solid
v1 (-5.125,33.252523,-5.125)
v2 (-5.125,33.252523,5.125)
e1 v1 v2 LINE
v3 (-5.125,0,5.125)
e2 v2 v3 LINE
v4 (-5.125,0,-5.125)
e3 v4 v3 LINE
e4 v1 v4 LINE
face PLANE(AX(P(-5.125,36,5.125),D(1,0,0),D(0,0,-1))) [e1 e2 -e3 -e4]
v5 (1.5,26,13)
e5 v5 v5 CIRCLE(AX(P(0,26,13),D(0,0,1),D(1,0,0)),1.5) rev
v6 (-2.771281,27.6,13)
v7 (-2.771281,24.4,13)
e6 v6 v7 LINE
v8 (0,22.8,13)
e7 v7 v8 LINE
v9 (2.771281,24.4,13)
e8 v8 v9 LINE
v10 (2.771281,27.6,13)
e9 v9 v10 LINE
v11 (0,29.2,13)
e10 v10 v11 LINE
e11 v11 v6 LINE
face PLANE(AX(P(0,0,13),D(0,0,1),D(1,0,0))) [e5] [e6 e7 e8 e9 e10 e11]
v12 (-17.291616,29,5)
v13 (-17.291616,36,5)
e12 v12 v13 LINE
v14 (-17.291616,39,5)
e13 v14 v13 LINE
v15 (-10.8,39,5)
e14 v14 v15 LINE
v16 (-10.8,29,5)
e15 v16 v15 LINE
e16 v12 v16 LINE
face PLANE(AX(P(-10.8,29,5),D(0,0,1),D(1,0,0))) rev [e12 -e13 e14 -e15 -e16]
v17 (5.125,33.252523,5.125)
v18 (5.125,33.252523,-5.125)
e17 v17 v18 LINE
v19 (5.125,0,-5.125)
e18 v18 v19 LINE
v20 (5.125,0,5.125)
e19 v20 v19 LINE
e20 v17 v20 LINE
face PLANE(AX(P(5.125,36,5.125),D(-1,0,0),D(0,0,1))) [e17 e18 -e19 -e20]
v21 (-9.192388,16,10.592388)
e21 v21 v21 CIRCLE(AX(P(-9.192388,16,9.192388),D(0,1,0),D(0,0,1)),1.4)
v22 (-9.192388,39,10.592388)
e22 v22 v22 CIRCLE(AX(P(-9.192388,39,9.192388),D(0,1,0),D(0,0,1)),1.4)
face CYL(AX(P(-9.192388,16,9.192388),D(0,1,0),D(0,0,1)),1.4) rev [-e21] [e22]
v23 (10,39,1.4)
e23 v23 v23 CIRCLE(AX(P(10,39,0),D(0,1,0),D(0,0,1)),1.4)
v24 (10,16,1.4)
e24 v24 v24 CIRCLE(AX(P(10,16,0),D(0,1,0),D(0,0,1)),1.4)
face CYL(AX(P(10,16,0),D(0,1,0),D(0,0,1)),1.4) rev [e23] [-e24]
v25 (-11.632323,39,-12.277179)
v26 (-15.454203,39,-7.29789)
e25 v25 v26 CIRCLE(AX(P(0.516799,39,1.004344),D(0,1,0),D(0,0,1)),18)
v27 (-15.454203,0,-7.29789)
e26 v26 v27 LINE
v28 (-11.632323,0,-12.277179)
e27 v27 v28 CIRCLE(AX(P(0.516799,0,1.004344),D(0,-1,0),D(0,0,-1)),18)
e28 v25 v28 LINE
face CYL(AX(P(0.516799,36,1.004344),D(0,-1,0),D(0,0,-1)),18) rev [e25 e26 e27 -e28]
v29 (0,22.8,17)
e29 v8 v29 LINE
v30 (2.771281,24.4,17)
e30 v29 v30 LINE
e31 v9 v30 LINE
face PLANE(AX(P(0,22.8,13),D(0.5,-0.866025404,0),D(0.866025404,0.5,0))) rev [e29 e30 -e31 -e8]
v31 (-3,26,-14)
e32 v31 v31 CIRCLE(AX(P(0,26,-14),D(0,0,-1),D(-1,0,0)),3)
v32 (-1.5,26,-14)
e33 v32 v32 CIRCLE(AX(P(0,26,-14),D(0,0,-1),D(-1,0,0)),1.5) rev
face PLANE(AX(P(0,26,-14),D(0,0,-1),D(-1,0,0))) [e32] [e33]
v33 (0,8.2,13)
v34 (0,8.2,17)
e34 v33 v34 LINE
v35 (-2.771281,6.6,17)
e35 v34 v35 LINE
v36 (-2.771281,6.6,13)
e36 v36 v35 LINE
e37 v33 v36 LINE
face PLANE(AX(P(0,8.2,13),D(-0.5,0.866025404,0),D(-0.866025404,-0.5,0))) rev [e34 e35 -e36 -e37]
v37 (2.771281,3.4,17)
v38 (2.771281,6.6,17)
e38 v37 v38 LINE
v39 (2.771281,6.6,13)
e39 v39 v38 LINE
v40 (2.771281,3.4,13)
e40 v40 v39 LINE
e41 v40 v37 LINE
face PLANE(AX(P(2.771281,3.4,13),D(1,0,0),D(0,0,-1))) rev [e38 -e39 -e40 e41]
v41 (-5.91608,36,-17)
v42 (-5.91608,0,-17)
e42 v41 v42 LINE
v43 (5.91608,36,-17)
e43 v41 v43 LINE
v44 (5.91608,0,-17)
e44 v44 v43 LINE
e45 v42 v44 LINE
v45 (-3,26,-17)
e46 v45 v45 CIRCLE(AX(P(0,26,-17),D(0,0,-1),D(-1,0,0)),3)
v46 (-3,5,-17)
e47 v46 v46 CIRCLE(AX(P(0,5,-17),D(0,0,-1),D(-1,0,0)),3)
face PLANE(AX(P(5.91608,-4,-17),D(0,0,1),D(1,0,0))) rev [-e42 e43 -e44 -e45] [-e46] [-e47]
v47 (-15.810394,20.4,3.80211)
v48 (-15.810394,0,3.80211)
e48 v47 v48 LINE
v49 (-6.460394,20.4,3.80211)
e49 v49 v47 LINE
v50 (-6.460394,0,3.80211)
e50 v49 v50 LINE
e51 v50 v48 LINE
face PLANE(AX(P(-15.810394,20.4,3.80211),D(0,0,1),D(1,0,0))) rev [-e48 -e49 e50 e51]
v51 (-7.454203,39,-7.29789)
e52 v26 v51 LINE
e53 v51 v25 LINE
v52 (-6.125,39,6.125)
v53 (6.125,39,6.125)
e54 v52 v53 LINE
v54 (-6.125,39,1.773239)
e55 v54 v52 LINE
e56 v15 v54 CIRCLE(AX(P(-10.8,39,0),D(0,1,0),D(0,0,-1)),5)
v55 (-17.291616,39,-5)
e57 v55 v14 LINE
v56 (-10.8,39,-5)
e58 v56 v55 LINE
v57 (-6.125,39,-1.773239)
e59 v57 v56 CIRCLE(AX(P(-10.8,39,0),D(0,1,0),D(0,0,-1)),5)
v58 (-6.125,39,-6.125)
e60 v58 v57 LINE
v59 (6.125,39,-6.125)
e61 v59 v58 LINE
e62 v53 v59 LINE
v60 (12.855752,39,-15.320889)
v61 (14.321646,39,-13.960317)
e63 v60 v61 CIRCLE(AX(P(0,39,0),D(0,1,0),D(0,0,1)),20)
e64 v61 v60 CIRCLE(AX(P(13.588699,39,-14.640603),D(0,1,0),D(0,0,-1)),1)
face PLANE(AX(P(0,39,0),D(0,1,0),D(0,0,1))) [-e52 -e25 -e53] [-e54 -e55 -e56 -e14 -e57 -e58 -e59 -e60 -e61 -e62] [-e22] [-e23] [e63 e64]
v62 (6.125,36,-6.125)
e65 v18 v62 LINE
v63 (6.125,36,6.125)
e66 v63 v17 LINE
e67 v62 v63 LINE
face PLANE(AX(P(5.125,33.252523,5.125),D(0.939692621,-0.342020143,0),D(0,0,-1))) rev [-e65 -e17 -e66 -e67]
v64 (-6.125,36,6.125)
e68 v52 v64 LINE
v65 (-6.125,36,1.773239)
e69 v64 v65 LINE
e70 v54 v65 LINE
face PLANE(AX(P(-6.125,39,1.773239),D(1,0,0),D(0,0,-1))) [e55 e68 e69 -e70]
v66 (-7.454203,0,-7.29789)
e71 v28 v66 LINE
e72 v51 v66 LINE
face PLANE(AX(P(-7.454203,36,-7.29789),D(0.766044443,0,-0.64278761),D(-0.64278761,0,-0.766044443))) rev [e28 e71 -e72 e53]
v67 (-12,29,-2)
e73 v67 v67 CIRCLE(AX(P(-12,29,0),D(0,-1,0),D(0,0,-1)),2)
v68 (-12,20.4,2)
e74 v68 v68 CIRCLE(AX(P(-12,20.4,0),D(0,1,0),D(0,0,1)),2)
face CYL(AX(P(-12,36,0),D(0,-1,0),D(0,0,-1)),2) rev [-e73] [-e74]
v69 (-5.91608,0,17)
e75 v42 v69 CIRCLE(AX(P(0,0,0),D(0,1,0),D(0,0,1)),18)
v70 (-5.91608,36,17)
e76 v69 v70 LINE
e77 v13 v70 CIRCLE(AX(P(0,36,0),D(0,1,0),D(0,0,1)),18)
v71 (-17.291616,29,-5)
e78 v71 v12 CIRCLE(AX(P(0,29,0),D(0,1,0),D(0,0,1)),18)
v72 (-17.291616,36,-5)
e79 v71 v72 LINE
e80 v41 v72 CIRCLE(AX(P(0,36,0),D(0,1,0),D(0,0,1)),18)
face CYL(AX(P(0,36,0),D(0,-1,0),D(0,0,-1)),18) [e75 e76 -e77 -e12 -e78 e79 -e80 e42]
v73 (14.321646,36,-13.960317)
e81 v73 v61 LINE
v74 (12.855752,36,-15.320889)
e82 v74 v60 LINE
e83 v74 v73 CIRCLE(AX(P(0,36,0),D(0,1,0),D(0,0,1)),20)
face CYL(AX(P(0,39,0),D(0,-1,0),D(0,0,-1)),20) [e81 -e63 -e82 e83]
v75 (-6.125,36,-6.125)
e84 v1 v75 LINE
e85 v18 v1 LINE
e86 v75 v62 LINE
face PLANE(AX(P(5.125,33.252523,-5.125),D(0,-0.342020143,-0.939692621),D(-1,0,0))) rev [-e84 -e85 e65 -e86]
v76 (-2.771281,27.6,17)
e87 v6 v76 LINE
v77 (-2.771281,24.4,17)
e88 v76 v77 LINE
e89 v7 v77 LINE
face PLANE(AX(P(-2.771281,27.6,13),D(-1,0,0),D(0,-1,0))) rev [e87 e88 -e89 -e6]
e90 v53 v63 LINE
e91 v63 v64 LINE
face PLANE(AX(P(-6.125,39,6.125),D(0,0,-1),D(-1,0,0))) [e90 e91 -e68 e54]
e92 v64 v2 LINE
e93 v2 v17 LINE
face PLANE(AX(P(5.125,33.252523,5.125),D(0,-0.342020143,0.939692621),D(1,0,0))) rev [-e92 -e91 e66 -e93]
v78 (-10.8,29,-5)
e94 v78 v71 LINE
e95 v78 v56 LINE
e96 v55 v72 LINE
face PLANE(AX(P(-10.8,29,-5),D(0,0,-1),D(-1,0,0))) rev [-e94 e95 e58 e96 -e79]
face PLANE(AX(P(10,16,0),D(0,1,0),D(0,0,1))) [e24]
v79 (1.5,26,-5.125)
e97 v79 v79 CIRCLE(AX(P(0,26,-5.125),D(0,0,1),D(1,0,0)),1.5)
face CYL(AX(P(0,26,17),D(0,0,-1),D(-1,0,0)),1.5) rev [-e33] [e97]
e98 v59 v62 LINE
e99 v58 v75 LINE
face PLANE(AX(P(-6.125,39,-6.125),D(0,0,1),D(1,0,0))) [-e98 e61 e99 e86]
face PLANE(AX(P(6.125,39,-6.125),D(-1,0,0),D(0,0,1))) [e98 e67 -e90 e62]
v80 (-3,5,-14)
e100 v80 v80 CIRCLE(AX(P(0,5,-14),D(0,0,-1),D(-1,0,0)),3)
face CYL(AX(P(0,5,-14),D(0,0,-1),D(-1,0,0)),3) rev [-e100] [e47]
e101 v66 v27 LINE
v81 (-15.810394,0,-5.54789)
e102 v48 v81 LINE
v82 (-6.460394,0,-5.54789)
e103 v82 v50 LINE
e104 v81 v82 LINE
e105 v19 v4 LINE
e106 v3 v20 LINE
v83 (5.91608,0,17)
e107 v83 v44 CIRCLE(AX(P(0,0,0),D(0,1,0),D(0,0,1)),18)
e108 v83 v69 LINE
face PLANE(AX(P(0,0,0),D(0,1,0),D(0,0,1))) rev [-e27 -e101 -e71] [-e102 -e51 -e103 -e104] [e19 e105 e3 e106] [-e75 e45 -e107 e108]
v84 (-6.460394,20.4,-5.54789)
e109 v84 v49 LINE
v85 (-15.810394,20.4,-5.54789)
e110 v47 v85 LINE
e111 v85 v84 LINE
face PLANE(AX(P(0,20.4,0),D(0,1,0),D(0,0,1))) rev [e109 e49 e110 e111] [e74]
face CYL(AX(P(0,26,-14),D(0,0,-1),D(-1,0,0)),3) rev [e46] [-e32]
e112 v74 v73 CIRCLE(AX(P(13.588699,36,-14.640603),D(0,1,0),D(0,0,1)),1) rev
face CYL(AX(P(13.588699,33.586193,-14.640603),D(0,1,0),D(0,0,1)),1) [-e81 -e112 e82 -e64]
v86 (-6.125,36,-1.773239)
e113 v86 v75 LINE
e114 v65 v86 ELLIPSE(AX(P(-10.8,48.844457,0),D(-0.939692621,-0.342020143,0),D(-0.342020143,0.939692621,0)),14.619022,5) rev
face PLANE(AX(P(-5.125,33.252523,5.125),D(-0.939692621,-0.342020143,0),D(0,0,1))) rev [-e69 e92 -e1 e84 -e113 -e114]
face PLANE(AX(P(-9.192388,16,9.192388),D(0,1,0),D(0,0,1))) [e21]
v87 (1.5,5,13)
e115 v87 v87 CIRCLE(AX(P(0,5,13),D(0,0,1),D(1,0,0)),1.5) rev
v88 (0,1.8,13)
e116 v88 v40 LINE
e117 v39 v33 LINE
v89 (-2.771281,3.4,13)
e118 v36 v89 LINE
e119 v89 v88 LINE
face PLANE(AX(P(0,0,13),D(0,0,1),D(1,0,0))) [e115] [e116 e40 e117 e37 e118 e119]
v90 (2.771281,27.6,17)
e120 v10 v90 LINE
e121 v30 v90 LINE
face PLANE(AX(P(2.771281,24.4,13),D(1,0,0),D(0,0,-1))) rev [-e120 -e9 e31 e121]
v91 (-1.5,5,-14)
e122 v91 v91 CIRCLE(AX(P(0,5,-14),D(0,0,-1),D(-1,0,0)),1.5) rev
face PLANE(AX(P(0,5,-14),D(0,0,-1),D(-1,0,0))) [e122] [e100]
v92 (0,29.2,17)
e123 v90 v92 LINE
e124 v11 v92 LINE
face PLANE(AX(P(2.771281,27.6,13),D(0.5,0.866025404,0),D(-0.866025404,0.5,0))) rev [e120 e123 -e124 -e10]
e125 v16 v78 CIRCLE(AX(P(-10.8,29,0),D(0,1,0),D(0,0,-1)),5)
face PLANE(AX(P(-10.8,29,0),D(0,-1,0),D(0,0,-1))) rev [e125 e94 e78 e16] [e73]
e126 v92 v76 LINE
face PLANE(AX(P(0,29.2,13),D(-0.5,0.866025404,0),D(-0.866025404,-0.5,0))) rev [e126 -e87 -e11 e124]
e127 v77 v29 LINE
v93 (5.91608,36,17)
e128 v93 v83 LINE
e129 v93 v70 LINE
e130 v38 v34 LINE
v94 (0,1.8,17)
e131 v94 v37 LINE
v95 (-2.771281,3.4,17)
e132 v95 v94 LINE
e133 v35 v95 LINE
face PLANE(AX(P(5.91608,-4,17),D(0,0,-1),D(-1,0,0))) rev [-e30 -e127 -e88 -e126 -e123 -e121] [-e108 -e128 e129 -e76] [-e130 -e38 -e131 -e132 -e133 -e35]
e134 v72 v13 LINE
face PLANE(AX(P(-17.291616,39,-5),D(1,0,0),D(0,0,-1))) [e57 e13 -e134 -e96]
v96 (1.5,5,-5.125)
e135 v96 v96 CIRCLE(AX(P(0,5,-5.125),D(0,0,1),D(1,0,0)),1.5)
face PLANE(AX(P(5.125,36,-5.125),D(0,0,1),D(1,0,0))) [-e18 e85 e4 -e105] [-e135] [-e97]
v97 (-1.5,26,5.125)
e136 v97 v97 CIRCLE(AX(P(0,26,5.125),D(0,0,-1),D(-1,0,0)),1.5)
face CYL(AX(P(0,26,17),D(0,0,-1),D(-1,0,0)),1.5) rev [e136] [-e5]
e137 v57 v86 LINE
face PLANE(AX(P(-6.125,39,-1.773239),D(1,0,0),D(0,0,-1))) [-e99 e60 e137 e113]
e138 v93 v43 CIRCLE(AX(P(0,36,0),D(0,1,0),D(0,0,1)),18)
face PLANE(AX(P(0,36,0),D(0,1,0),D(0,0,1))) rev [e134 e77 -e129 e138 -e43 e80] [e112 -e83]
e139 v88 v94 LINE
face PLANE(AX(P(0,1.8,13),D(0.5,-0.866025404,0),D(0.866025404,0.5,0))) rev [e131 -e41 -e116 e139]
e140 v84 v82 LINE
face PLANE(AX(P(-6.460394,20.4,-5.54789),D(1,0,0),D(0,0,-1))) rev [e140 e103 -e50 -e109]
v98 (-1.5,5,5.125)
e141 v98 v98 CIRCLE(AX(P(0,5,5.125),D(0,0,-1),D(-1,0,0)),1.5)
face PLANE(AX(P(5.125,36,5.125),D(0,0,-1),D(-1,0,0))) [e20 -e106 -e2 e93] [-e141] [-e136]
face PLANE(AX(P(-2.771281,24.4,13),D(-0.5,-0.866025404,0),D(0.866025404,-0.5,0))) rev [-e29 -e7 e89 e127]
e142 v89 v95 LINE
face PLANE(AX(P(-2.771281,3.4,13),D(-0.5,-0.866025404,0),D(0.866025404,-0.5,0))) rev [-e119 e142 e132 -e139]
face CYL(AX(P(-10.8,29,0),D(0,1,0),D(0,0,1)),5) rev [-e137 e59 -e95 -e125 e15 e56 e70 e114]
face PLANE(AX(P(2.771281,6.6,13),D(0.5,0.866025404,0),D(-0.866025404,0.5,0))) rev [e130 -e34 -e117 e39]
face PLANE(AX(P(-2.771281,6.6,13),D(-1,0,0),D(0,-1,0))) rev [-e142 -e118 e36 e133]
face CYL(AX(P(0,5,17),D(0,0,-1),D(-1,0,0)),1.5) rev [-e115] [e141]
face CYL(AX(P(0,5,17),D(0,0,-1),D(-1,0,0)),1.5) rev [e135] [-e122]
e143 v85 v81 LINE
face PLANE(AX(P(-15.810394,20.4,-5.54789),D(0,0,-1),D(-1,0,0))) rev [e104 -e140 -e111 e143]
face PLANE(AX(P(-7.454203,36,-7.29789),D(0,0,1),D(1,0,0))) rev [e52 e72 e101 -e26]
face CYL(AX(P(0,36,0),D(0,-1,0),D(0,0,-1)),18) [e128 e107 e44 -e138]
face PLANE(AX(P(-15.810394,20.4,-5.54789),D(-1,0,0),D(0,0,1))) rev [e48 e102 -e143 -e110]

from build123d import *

# Parameters (mm, degrees)
SKETCH1_R           = 18
SKETCH1_R_2         = 2
SKETCH1_W           = 10.25
SKETCH1_H           = 10.25
BOSS_EXTRUDE1_DEPTH = 36
CUT_EXTRUDE1_START  = -7
CUT_EXTRUDE1_DEPTH  = 7
SKETCH4_W           = 9.35
SKETCH4_H           = 9.35
CUT_EXTRUDE3_DEPTH  = 20.4
CUT_EXTRUDE4_START  = -40
CUT_EXTRUDE4_DEPTH  = 40
SKETCH6_R           = 1.5
CUT_EXTRUDE5_DEPTH  = 53.687759489
SKETCH7_R           = 3
CUT_EXTRUDE6_DEPTH  = 3
CUT_EXTRUDE7_DEPTH  = 4
CHAMFER1_SIZE       = 1
CHAMFER1_SIZE_2     = 2.747477419
CUT_EXTRUDE8_DEPTH  = 44.69210455
SKETCH12_R          = 1.4
CUT_EXTRUDE10_DEPTH = 20
SKETCH13_R          = 20
SKETCH13_R_2        = 1.4
BOSS_EXTRUDE2_DEPTH = 3
BOSS_EXTRUDE3_DEPTH = 3


with BuildPart() as part:
    # Sketch1 → Boss-Extrude1 (new body)
    with BuildSketch(Plane(origin=(0, 0, 0), x_dir=(1, 0, 0), z_dir=(0, 1, 0))):
        with Locations(Location((0, 0, 0), (0, 0, 270))):
            Circle(SKETCH1_R)
        with Locations(Location((-12, 0, 0), (0, 0, 270))):
            Circle(SKETCH1_R_2, mode=Mode.SUBTRACT)
        Rectangle(SKETCH1_W, SKETCH1_H, mode=Mode.SUBTRACT)
    extrude(amount=BOSS_EXTRUDE1_DEPTH)

    # Sketch2 → Cut-Extrude1 (cut)
    with BuildSketch(Plane(origin=(0, 36, 0), x_dir=(1, 0, 0), z_dir=(0, 1, 0)).offset(CUT_EXTRUDE1_START)):
        with BuildLine():
            Line((-10.8, 5), (-17.291616466, 5))
            ThreePointArc((-17.291616466, 5), (-18, 0), (-17.291616466, -5))
            Line((-17.291616466, -5), (-10.8, -5))
            ThreePointArc((-10.8, -5), (-5.8, 0), (-10.8, 5))
        make_face()
    extrude(amount=CUT_EXTRUDE1_DEPTH, mode=Mode.SUBTRACT)

    # Sketch4 → Cut-Extrude3 (cut)
    with BuildSketch(Plane(origin=(0, 0, 0), x_dir=(-1, 0, 0), z_dir=(0, -1, 0))):
        with Locations((11.135393506, 0.872889968)):
            Rectangle(SKETCH4_W, SKETCH4_H)
    extrude(amount=-CUT_EXTRUDE3_DEPTH, mode=Mode.SUBTRACT)

    # Sketch5 → Cut-Extrude4 (cut)
    with BuildSketch(Plane(origin=(0, 36, 0), x_dir=(1, 0, 0), z_dir=(0, 1, 0)).offset(CUT_EXTRUDE4_START)):
        with BuildLine():
            Line((5.916079783, 17), (-5.916079783, 17))
            ThreePointArc((-5.916079783, 17), (0, 18), (5.916079783, 17))
        make_face()
        with BuildLine():
            Line((5.916079783, -17), (-5.916079783, -17))
            ThreePointArc((-5.916079783, -17), (0, -18), (5.916079783, -17))
        make_face()
    extrude(amount=CUT_EXTRUDE4_DEPTH, mode=Mode.SUBTRACT)

    # Sketch6 → Cut-Extrude5 (cut, through all)
    with BuildSketch(Plane(origin=(0, 0, -17), x_dir=(-1, 0, 0), z_dir=(0, 0, -1))):
        with Locations((0, 26)):
            Circle(SKETCH6_R)
        with Locations((0, 5)):
            Circle(SKETCH6_R)
    extrude(amount=-CUT_EXTRUDE5_DEPTH, mode=Mode.SUBTRACT)

    # Sketch7 → Cut-Extrude6 (cut)
    with BuildSketch(Plane(origin=(0, 0, -17), x_dir=(-1, 0, 0), z_dir=(0, 0, -1))):
        with Locations((0, 26)):
            Circle(SKETCH7_R)
        with Locations((0, 5)):
            Circle(SKETCH7_R)
    extrude(amount=-CUT_EXTRUDE6_DEPTH, mode=Mode.SUBTRACT)

    # Sketch8 → Cut-Extrude7 (cut)
    with BuildSketch(Plane.XY.offset(17)):
        Polygon((0, 22.8), (2.771281292, 24.4), (2.771281292, 27.6), (0, 29.2), (-2.771281292, 27.6), (-2.771281292, 24.4), align=None)
        Polygon((0, 1.8), (2.771281292, 3.4), (2.771281292, 6.6), (0, 8.2), (-2.771281292, 6.6), (-2.771281292, 3.4), align=None)
    extrude(amount=-CUT_EXTRUDE7_DEPTH, mode=Mode.SUBTRACT)

    # Chamfer1
    # the kernel refuses this chamfer: 2.747477419, 1 mm, written as the material it takes off along each edge
    with BuildSketch(Plane(origin=(-5.125, 36, -5.125), x_dir=(0, 0.09904090225204956, -0.9950833631817488), z_dir=(1, 0, 0)), Plane(origin=(-5.125, 36, 5.125), x_dir=(-0.9950833631817488, 0.09904090225204956, 0), z_dir=(0, 0, -1)), Plane(origin=(5.125, 36, 5.125), x_dir=(0, 0.09904090225204956, 0.9950833631817488), z_dir=(-1, 0, 0)), Plane(origin=(5.125, 36, -5.125), x_dir=(0.9950833631817488, 0.09904090225204956, 0), z_dir=(0, 0, 1))) as chamfer1_piece_1:
        Polygon((CHAMFER1_SIZE * 0.995083363182, -CHAMFER1_SIZE * 0.099040902252), (-CHAMFER1_SIZE_2 * 0.0990409022684, -CHAMFER1_SIZE_2 * 0.995083363346), (0, 0), align=None)
    extrude(amount=10.25, mode=Mode.SUBTRACT)
    with BuildSketch(Plane(origin=(-5.125, 36, 5.125), x_dir=(-0.9950833631817488, 0.09904090225204956, 0), z_dir=(0, 0, -1))) as chamfer1_piece_2a_section:
        Polygon((CHAMFER1_SIZE * 0.995083363182, -CHAMFER1_SIZE * 0.099040902252), (-CHAMFER1_SIZE_2 * 0.0990409022684, -CHAMFER1_SIZE_2 * 0.995083363346), (0, 0), align=None)
    chamfer1_piece_2a = extrude(amount=17.377491449, mode=Mode.PRIVATE)
    chamfer1_piece_2a = split(chamfer1_piece_2a, bisect_by=Plane(origin=(-5.432505006, 35.059901151, -5.125), z_dir=(0, 0, -1)), keep=Keep.TOP, mode=Mode.PRIVATE)
    with BuildSketch(Plane(origin=(-12.252491449, 36, -5.125), x_dir=(0, 0.09904090225204956, -0.9950833631817488), z_dir=(1, 0, 0))) as chamfer1_piece_2b_section:
        Polygon((CHAMFER1_SIZE * 0.995083363182, -CHAMFER1_SIZE * 0.099040902252), (-CHAMFER1_SIZE_2 * 0.0990409022684, -CHAMFER1_SIZE_2 * 0.995083363346), (0, 0), align=None)
    chamfer1_piece_2b = extrude(amount=17.377491449, mode=Mode.PRIVATE)
    chamfer1_piece_2b = split(chamfer1_piece_2b, bisect_by=Plane(origin=(-5.125, 35.059901151, -5.432505006), z_dir=(-1, 0, 0)), keep=Keep.TOP, mode=Mode.PRIVATE)
    chamfer1_piece_2 = chamfer1_piece_2a & chamfer1_piece_2b
    add(chamfer1_piece_2, mode=Mode.SUBTRACT)
    with BuildSketch(Plane(origin=(5.125, 36, -12.252491449), x_dir=(0.9950833631817488, 0.09904090225204956, 0), z_dir=(0, 0, 1))) as chamfer1_piece_3a_section:
        Polygon((CHAMFER1_SIZE * 0.995083363182, -CHAMFER1_SIZE * 0.099040902252), (-CHAMFER1_SIZE_2 * 0.0990409022684, -CHAMFER1_SIZE_2 * 0.995083363346), (0, 0), align=None)
    chamfer1_piece_3a = extrude(amount=17.377491449, mode=Mode.PRIVATE)
    chamfer1_piece_3a = split(chamfer1_piece_3a, bisect_by=Plane(origin=(5.432505006, 35.059901151, -5.125), z_dir=(0, 0, -1)), keep=Keep.TOP, mode=Mode.PRIVATE)
    with BuildSketch(Plane(origin=(-5.125, 36, -5.125), x_dir=(0, 0.09904090225204956, -0.9950833631817488), z_dir=(1, 0, 0))) as chamfer1_piece_3b_section:
        Polygon((CHAMFER1_SIZE * 0.995083363182, -CHAMFER1_SIZE * 0.099040902252), (-CHAMFER1_SIZE_2 * 0.0990409022684, -CHAMFER1_SIZE_2 * 0.995083363346), (0, 0), align=None)
    chamfer1_piece_3b = extrude(amount=17.377491449, mode=Mode.PRIVATE)
    chamfer1_piece_3b = split(chamfer1_piece_3b, bisect_by=Plane(origin=(5.125, 35.059901151, -5.432505006), z_dir=(1, 0, 0)), keep=Keep.TOP, mode=Mode.PRIVATE)
    chamfer1_piece_3 = chamfer1_piece_3a & chamfer1_piece_3b
    add(chamfer1_piece_3, mode=Mode.SUBTRACT)
    with BuildSketch(Plane(origin=(5.125, 36, 5.125), x_dir=(0, 0.09904090225204956, 0.9950833631817488), z_dir=(-1, 0, 0))) as chamfer1_piece_4a_section:
        Polygon((CHAMFER1_SIZE * 0.995083363182, -CHAMFER1_SIZE * 0.099040902252), (-CHAMFER1_SIZE_2 * 0.0990409022684, -CHAMFER1_SIZE_2 * 0.995083363346), (0, 0), align=None)
    chamfer1_piece_4a = extrude(amount=17.377491449, mode=Mode.PRIVATE)
    chamfer1_piece_4a = split(chamfer1_piece_4a, bisect_by=Plane(origin=(-5.125, 35.059901151, 5.432505006), z_dir=(-1, 0, 0)), keep=Keep.TOP, mode=Mode.PRIVATE)
    with BuildSketch(Plane(origin=(-5.125, 36, 12.252491449), x_dir=(-0.9950833631817488, 0.09904090225204956, 0), z_dir=(0, 0, -1))) as chamfer1_piece_4b_section:
        Polygon((CHAMFER1_SIZE * 0.995083363182, -CHAMFER1_SIZE * 0.099040902252), (-CHAMFER1_SIZE_2 * 0.0990409022684, -CHAMFER1_SIZE_2 * 0.995083363346), (0, 0), align=None)
    chamfer1_piece_4b = extrude(amount=17.377491449, mode=Mode.PRIVATE)
    chamfer1_piece_4b = split(chamfer1_piece_4b, bisect_by=Plane(origin=(-5.432505006, 35.059901151, 5.125), z_dir=(0, 0, 1)), keep=Keep.TOP, mode=Mode.PRIVATE)
    chamfer1_piece_4 = chamfer1_piece_4a & chamfer1_piece_4b
    add(chamfer1_piece_4, mode=Mode.SUBTRACT)
    with BuildSketch(Plane(origin=(12.252491449, 36, 5.125), x_dir=(0, 0.09904090225204956, 0.9950833631817488), z_dir=(-1, 0, 0))) as chamfer1_piece_5a_section:
        Polygon((CHAMFER1_SIZE * 0.995083363182, -CHAMFER1_SIZE * 0.099040902252), (-CHAMFER1_SIZE_2 * 0.0990409022684, -CHAMFER1_SIZE_2 * 0.995083363346), (0, 0), align=None)
    chamfer1_piece_5a = extrude(amount=17.377491449, mode=Mode.PRIVATE)
    chamfer1_piece_5a = split(chamfer1_piece_5a, bisect_by=Plane(origin=(5.125, 35.059901151, 5.432505006), z_dir=(1, 0, 0)), keep=Keep.TOP, mode=Mode.PRIVATE)
    with BuildSketch(Plane(origin=(5.125, 36, -5.125), x_dir=(0.9950833631817488, 0.09904090225204956, 0), z_dir=(0, 0, 1))) as chamfer1_piece_5b_section:
        Polygon((CHAMFER1_SIZE * 0.995083363182, -CHAMFER1_SIZE * 0.099040902252), (-CHAMFER1_SIZE_2 * 0.0990409022684, -CHAMFER1_SIZE_2 * 0.995083363346), (0, 0), align=None)
    chamfer1_piece_5b = extrude(amount=17.377491449, mode=Mode.PRIVATE)
    chamfer1_piece_5b = split(chamfer1_piece_5b, bisect_by=Plane(origin=(5.432505006, 35.059901151, 5.125), z_dir=(0, 0, 1)), keep=Keep.TOP, mode=Mode.PRIVATE)
    chamfer1_piece_5 = chamfer1_piece_5a & chamfer1_piece_5b
    add(chamfer1_piece_5, mode=Mode.SUBTRACT)

    # Sketch9 → Cut-Extrude8 (cut, through all)
    with BuildSketch(Plane.XZ):
        with BuildLine():
            Line((-7.454203172, -7.297889968), (-15.454203172, -7.297889968))
            ThreePointArc((-15.454203172, -7.297889968), (-13.761984914, -9.955415688), (-11.632322635, -12.277178848))
            Line((-11.632322635, -12.277178848), (-7.454203172, -7.297889968))
        make_face()
    extrude(amount=-CUT_EXTRUDE8_DEPTH, mode=Mode.SUBTRACT)

    # Sketch12 → Cut-Extrude10 (cut)
    with BuildSketch(Plane(origin=(0, 36, 0), x_dir=(1, 0, 0), z_dir=(0, 1, 0))):
        with Locations(Location((10, 0, 0), (0, 0, 270))):
            Circle(SKETCH12_R)
        with Locations(Location((-9.192388155, -9.192388155, 0), (0, 0, 270))):
            Circle(SKETCH12_R)
    extrude(amount=-CUT_EXTRUDE10_DEPTH, mode=Mode.SUBTRACT)

    # Sketch13 → Boss-Extrude2 (add)
    with BuildSketch(Plane(origin=(0, 36, 0), x_dir=(1, 0, 0), z_dir=(0, 1, 0))):
        with Locations(Location((0, 0, 0), (0, 0, 270))):
            Circle(SKETCH13_R)
        with Locations(Location((10, 0, 0), (0, 0, 270))):
            Circle(SKETCH13_R_2, mode=Mode.SUBTRACT)
        with Locations(Location((-9.192388155, -9.192388155, 0), (0, 0, 270))):
            Circle(SKETCH13_R_2, mode=Mode.SUBTRACT)
        with BuildLine():
            Line((-10.8, 5), (-17.291616466, 5))
            Line((-17.291616466, 5), (-17.291616466, -5))
            Line((-17.291616466, -5), (-10.8, -5))
            ThreePointArc((-10.8, -5), (-7.959770503, -4.114984375), (-6.125, -1.773238563))
            Line((-6.125, -1.773238563), (-6.125, -6.125))
            Line((-6.125, -6.125), (6.125, -6.125))
            Line((6.125, -6.125), (6.125, 6.125))
            Line((6.125, 6.125), (-6.125, 6.125))
            Line((-6.125, 6.125), (-6.125, 1.773238563))
            ThreePointArc((-6.125, 1.773238563), (-7.959770503, 4.114984375), (-10.8, 5))
        make_face(mode=Mode.SUBTRACT)
        with BuildLine():
            Line((-7.454203172, 7.297889968), (-15.454203172, 7.297889968))
            ThreePointArc((-15.454203172, 7.297889968), (-13.761984914, 9.955415688), (-11.632322635, 12.277178848))
            Line((-11.632322635, 12.277178848), (-7.454203172, 7.297889968))
        make_face(mode=Mode.SUBTRACT)
    extrude(amount=BOSS_EXTRUDE2_DEPTH)

    # Sketch14 → Boss-Extrude3 (add)
    with BuildSketch(Plane(origin=(0, 39, 0), x_dir=(1, 0, 0), z_dir=(0, 1, 0))):
        with BuildLine():
            Line((12.855752194, 15.320888862), (14.321646009, 13.960317173))
            ThreePointArc((14.321646009, 13.960317173), (14.268984946, 15.373549926), (12.855752194, 15.320888862))
        make_face()
    extrude(amount=-BOSS_EXTRUDE3_DEPTH)


solid = part.part
